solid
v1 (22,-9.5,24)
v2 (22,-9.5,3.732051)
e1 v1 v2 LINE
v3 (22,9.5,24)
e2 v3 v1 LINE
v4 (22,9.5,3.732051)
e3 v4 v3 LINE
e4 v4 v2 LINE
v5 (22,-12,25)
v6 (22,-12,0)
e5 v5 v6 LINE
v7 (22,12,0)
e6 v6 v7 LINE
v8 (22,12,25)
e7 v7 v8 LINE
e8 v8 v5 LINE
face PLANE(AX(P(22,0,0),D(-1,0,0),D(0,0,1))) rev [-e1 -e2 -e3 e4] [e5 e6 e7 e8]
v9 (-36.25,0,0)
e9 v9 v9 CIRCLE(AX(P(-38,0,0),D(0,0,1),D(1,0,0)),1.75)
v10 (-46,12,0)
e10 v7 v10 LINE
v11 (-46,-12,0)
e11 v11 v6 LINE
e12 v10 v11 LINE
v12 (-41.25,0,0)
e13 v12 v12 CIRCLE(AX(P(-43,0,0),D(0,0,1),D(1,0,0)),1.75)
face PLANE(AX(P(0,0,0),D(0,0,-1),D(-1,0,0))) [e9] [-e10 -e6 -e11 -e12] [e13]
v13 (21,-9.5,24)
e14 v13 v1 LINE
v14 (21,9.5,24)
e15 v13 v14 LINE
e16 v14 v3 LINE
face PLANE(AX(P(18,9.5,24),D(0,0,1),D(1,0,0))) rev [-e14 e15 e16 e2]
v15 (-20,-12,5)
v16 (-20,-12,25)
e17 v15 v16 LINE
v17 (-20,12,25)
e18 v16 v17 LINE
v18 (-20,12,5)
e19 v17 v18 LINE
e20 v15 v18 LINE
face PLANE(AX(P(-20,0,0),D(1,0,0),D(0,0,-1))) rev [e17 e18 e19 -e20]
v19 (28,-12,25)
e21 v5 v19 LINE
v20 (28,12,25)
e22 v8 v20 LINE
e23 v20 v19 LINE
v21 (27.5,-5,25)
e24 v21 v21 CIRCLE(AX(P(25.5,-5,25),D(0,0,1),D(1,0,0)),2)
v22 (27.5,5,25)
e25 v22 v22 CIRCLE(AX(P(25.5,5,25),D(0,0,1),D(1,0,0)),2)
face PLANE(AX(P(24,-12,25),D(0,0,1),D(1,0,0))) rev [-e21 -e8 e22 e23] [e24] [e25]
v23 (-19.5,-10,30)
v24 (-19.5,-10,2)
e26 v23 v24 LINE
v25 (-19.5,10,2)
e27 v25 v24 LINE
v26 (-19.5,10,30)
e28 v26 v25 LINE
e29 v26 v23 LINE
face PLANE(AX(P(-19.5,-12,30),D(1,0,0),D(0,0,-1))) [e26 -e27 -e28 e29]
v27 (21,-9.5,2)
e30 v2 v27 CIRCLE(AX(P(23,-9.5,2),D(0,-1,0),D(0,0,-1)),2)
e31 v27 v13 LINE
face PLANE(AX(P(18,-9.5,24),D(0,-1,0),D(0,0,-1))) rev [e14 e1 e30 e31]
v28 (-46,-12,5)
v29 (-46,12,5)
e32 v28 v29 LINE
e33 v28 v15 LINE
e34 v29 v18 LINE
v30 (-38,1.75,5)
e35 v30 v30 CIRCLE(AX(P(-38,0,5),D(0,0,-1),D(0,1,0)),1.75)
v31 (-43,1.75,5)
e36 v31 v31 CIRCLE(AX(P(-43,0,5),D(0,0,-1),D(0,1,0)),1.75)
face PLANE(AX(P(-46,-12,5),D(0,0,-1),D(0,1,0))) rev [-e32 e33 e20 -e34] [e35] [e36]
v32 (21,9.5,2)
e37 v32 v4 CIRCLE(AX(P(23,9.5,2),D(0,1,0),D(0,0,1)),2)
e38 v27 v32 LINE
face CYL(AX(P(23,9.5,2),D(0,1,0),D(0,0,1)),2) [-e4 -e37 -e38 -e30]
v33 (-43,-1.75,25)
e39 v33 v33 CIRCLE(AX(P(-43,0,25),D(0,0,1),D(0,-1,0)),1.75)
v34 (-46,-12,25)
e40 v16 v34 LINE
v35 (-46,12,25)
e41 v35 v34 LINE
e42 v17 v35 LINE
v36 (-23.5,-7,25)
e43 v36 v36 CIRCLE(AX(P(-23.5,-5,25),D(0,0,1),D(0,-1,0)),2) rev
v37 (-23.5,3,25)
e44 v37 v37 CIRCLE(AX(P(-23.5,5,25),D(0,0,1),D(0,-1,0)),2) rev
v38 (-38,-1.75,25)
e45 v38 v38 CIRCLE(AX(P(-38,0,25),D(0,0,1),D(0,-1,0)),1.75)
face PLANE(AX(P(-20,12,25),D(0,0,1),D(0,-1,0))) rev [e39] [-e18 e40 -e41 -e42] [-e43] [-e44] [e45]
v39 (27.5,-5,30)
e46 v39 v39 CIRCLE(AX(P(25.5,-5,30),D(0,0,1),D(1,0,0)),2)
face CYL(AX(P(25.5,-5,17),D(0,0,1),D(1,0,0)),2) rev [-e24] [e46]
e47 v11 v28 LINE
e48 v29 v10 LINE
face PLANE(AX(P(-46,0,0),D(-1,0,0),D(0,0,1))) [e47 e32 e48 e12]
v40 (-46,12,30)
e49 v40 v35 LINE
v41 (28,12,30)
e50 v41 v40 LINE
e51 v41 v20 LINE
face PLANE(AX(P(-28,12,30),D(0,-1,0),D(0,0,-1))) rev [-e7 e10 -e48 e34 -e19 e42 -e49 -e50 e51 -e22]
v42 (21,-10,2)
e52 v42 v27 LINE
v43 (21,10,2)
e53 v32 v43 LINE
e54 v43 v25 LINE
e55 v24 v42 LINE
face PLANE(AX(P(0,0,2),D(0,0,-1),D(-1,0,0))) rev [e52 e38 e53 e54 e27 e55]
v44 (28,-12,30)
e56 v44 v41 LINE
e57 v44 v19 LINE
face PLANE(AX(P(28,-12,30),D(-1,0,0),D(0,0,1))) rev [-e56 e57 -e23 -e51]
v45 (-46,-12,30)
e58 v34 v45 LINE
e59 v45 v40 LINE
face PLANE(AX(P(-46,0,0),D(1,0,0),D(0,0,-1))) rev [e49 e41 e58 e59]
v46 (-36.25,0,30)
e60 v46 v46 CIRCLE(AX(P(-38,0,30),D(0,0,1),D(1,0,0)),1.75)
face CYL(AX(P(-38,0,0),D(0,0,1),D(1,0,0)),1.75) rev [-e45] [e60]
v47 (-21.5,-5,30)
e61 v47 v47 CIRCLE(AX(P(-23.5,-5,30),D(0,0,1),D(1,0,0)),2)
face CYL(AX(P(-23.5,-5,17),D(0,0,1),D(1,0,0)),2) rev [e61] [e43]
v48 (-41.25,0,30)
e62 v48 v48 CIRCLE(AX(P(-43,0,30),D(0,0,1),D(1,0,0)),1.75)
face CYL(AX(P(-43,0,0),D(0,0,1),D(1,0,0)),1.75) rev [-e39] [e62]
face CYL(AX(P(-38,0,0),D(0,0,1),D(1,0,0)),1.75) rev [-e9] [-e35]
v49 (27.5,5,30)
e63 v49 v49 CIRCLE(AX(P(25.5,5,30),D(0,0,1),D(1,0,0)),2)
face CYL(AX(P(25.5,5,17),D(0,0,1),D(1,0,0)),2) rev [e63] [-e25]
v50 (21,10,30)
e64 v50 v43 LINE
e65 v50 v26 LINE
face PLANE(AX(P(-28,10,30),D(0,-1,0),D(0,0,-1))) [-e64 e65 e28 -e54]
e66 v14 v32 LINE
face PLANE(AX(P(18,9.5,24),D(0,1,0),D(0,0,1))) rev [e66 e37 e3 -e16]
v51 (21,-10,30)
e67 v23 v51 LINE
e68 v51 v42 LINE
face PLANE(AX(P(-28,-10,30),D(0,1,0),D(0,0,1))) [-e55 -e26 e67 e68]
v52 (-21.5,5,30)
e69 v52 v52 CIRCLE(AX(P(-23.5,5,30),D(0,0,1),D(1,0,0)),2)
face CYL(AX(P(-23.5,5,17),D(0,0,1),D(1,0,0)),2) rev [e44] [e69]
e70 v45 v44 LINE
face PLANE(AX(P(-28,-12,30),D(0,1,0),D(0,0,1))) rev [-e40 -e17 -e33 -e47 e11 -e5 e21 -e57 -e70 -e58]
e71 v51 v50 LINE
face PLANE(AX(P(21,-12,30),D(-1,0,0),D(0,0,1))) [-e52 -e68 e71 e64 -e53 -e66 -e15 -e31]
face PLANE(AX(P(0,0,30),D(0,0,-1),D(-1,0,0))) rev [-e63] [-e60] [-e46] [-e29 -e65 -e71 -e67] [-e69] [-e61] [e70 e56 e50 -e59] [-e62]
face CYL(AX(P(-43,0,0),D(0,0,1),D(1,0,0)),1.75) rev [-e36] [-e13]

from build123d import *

# Parameters (mm, degrees)
SKETCH1_W                 = 56
SKETCH1_H                 = 24
BOSS_EXTRUDE1_DEPTH       = 30
SHELL1_T                  = -2
SHELL1_THICKNESS_2_FACE_W = 28
SHELL1_THICKNESS_2_FACE_H = 20
SHELL1_THICKNESS_2_DEPTH  = 6.5
SHELL1_THICKNESS_3_FACE_W = 28
SHELL1_THICKNESS_3_FACE_H = 20
SHELL1_THICKNESS_3_DEPTH  = 5
SKETCH12_W                = 20
SKETCH12_H                = 19
CUT_EXTRUDE1_DEPTH        = 10
FILLET1_R                 = 2
SKETCH13_W                = 2
SKETCH13_H                = 24
CUT_EXTRUDE2_DEPTH        = 43.755116653
SKETCH17_W                = 25
SKETCH17_H                = 24
CUT_EXTRUDE4_DEPTH        = 4
SKETCH19_R                = 2
CUT_EXTRUDE5_DEPTH        = 13
CUT_EXTRUDE7_DEPTH        = 2
SKETCH21_W                = 25
SKETCH21_H                = 24
CUT_EXTRUDE8_DEPTH        = 6
SKETCH26_W                = 5
SKETCH26_H                = 24
BOSS_EXTRUDE3_DEPTH       = 20
SKETCH27_W                = 5
SKETCH27_H                = 24
BOSS_EXTRUDE4_DEPTH       = 26
SKETCH28_R                = 1.75
CUT_EXTRUDE9_DEPTH        = 57.21387729


with BuildPart() as part:
    # Sketch1 → Boss-Extrude1 (new body)
    with BuildSketch(Plane.XY):
        Rectangle(SKETCH1_W, SKETCH1_H)
    extrude(amount=BOSS_EXTRUDE1_DEPTH)

    # Shell1
    shell1_openings = [part.faces().sort_by_distance(p)[0] for p in [
        (0, 0, 30),
    ]]
    offset(amount=SHELL1_T, openings=shell1_openings, kind=Kind.INTERSECTION)

    # Shell1 thickness 2 face (on inner face of the shell) → Shell1 thickness 2 (add)
    with BuildSketch(Plane(origin=(-26, 0, 16), x_dir=(0, 0, -1), z_dir=(-1, 0, 0))):
        Rectangle(SHELL1_THICKNESS_2_FACE_W, SHELL1_THICKNESS_2_FACE_H)
    extrude(amount=-SHELL1_THICKNESS_2_DEPTH)

    # Shell1 thickness 3 face (on inner face of the shell) → Shell1 thickness 3 (add)
    with BuildSketch(Plane(origin=(26, 0, 16), x_dir=(0, 0, 1), z_dir=(1, 0, 0))):
        Rectangle(SHELL1_THICKNESS_3_FACE_W, SHELL1_THICKNESS_3_FACE_H)
    extrude(amount=-SHELL1_THICKNESS_3_DEPTH)

    # Sketch12 → Cut-Extrude1 (cut)
    with BuildSketch(Plane(origin=(28, 0, 0), x_dir=(0, 0, -1), z_dir=(1, 0, 0))):
        with Locations((-14, 0)):
            Rectangle(SKETCH12_W, SKETCH12_H)
    extrude(amount=-CUT_EXTRUDE1_DEPTH, mode=Mode.SUBTRACT)

    # Fillet1
    fillet1_edges = [part.edges().sort_by_distance(p)[0] for p in [
        (21, 0, 4),
    ]]
    fillet(fillet1_edges, radius=FILLET1_R - 0.0001)  # a hair under: the kernel refuses the full size

    # Sketch13 → Cut-Extrude2 (cut, through all)
    with BuildSketch(Plane.XY.offset(30)):
        with Locations((-27, 0)):
            Rectangle(SKETCH13_W, SKETCH13_H)
    extrude(amount=-CUT_EXTRUDE2_DEPTH, mode=Mode.SUBTRACT)

    # Sketch17 → Cut-Extrude4 (cut)
    with BuildSketch(Plane(origin=(28, 0, 0), x_dir=(0, 0, -1), z_dir=(1, 0, 0))):
        with Locations((-12.5, 0)):
            Rectangle(SKETCH17_W, SKETCH17_H)
    extrude(amount=-CUT_EXTRUDE4_DEPTH, mode=Mode.SUBTRACT)

    # Sketch19 → Cut-Extrude5 (cut)
    with BuildSketch(Plane.XY.offset(30)):
        with Locations((-23.5, -5)):
            Circle(SKETCH19_R)
        with Locations((-23.5, 5)):
            Circle(SKETCH19_R)
        with Locations((25.5, 5)):
            Circle(SKETCH19_R)
        with Locations((25.5, -5)):
            Circle(SKETCH19_R)
    extrude(amount=-CUT_EXTRUDE5_DEPTH, mode=Mode.SUBTRACT)

    # Sketch20 → Cut-Extrude7 (cut)
    with BuildSketch(Plane(origin=(24, 0, 0), x_dir=(0, 0, -1), z_dir=(1, 0, 0))):
        Polygon((-25, 6.322875656), (-25, 12), (0, 12), (0, -12), (-25, -12), (-25, -6.322875656), align=None)
        Polygon((-24, -6.322875656), (-24, -9.5), (-4, -9.5), (-4, 9.5), (-24, 9.5), (-24, 6.322875656), align=None, mode=Mode.SUBTRACT)
    extrude(amount=-CUT_EXTRUDE7_DEPTH, mode=Mode.SUBTRACT)

    # Sketch21 → Cut-Extrude8 (cut)
    with BuildSketch(Plane.ZY.offset(26)):
        with Locations((12.5, 0)):
            Rectangle(SKETCH21_W, SKETCH21_H)
    extrude(amount=-CUT_EXTRUDE8_DEPTH, mode=Mode.SUBTRACT)

    # Sketch26 → Boss-Extrude3 (add)
    with BuildSketch(Plane.ZY.offset(26)):
        with Locations((27.5, 0)):
            Rectangle(SKETCH26_W, SKETCH26_H)
    extrude(amount=BOSS_EXTRUDE3_DEPTH)

    # Sketch27 → Boss-Extrude4 (add)
    with BuildSketch(Plane.ZY.offset(20)):
        with Locations((2.5, 0)):
            Rectangle(SKETCH27_W, SKETCH27_H)
    extrude(amount=BOSS_EXTRUDE4_DEPTH)

    # Sketch28 → Cut-Extrude9 (cut, through all)
    with BuildSketch(Plane.XY.offset(30)):
        with Locations((-43, 0)):
            Circle(SKETCH28_R)
        with Locations((-38, 0)):
            Circle(SKETCH28_R)
    extrude(amount=-CUT_EXTRUDE9_DEPTH, mode=Mode.SUBTRACT)


solid = part.part
